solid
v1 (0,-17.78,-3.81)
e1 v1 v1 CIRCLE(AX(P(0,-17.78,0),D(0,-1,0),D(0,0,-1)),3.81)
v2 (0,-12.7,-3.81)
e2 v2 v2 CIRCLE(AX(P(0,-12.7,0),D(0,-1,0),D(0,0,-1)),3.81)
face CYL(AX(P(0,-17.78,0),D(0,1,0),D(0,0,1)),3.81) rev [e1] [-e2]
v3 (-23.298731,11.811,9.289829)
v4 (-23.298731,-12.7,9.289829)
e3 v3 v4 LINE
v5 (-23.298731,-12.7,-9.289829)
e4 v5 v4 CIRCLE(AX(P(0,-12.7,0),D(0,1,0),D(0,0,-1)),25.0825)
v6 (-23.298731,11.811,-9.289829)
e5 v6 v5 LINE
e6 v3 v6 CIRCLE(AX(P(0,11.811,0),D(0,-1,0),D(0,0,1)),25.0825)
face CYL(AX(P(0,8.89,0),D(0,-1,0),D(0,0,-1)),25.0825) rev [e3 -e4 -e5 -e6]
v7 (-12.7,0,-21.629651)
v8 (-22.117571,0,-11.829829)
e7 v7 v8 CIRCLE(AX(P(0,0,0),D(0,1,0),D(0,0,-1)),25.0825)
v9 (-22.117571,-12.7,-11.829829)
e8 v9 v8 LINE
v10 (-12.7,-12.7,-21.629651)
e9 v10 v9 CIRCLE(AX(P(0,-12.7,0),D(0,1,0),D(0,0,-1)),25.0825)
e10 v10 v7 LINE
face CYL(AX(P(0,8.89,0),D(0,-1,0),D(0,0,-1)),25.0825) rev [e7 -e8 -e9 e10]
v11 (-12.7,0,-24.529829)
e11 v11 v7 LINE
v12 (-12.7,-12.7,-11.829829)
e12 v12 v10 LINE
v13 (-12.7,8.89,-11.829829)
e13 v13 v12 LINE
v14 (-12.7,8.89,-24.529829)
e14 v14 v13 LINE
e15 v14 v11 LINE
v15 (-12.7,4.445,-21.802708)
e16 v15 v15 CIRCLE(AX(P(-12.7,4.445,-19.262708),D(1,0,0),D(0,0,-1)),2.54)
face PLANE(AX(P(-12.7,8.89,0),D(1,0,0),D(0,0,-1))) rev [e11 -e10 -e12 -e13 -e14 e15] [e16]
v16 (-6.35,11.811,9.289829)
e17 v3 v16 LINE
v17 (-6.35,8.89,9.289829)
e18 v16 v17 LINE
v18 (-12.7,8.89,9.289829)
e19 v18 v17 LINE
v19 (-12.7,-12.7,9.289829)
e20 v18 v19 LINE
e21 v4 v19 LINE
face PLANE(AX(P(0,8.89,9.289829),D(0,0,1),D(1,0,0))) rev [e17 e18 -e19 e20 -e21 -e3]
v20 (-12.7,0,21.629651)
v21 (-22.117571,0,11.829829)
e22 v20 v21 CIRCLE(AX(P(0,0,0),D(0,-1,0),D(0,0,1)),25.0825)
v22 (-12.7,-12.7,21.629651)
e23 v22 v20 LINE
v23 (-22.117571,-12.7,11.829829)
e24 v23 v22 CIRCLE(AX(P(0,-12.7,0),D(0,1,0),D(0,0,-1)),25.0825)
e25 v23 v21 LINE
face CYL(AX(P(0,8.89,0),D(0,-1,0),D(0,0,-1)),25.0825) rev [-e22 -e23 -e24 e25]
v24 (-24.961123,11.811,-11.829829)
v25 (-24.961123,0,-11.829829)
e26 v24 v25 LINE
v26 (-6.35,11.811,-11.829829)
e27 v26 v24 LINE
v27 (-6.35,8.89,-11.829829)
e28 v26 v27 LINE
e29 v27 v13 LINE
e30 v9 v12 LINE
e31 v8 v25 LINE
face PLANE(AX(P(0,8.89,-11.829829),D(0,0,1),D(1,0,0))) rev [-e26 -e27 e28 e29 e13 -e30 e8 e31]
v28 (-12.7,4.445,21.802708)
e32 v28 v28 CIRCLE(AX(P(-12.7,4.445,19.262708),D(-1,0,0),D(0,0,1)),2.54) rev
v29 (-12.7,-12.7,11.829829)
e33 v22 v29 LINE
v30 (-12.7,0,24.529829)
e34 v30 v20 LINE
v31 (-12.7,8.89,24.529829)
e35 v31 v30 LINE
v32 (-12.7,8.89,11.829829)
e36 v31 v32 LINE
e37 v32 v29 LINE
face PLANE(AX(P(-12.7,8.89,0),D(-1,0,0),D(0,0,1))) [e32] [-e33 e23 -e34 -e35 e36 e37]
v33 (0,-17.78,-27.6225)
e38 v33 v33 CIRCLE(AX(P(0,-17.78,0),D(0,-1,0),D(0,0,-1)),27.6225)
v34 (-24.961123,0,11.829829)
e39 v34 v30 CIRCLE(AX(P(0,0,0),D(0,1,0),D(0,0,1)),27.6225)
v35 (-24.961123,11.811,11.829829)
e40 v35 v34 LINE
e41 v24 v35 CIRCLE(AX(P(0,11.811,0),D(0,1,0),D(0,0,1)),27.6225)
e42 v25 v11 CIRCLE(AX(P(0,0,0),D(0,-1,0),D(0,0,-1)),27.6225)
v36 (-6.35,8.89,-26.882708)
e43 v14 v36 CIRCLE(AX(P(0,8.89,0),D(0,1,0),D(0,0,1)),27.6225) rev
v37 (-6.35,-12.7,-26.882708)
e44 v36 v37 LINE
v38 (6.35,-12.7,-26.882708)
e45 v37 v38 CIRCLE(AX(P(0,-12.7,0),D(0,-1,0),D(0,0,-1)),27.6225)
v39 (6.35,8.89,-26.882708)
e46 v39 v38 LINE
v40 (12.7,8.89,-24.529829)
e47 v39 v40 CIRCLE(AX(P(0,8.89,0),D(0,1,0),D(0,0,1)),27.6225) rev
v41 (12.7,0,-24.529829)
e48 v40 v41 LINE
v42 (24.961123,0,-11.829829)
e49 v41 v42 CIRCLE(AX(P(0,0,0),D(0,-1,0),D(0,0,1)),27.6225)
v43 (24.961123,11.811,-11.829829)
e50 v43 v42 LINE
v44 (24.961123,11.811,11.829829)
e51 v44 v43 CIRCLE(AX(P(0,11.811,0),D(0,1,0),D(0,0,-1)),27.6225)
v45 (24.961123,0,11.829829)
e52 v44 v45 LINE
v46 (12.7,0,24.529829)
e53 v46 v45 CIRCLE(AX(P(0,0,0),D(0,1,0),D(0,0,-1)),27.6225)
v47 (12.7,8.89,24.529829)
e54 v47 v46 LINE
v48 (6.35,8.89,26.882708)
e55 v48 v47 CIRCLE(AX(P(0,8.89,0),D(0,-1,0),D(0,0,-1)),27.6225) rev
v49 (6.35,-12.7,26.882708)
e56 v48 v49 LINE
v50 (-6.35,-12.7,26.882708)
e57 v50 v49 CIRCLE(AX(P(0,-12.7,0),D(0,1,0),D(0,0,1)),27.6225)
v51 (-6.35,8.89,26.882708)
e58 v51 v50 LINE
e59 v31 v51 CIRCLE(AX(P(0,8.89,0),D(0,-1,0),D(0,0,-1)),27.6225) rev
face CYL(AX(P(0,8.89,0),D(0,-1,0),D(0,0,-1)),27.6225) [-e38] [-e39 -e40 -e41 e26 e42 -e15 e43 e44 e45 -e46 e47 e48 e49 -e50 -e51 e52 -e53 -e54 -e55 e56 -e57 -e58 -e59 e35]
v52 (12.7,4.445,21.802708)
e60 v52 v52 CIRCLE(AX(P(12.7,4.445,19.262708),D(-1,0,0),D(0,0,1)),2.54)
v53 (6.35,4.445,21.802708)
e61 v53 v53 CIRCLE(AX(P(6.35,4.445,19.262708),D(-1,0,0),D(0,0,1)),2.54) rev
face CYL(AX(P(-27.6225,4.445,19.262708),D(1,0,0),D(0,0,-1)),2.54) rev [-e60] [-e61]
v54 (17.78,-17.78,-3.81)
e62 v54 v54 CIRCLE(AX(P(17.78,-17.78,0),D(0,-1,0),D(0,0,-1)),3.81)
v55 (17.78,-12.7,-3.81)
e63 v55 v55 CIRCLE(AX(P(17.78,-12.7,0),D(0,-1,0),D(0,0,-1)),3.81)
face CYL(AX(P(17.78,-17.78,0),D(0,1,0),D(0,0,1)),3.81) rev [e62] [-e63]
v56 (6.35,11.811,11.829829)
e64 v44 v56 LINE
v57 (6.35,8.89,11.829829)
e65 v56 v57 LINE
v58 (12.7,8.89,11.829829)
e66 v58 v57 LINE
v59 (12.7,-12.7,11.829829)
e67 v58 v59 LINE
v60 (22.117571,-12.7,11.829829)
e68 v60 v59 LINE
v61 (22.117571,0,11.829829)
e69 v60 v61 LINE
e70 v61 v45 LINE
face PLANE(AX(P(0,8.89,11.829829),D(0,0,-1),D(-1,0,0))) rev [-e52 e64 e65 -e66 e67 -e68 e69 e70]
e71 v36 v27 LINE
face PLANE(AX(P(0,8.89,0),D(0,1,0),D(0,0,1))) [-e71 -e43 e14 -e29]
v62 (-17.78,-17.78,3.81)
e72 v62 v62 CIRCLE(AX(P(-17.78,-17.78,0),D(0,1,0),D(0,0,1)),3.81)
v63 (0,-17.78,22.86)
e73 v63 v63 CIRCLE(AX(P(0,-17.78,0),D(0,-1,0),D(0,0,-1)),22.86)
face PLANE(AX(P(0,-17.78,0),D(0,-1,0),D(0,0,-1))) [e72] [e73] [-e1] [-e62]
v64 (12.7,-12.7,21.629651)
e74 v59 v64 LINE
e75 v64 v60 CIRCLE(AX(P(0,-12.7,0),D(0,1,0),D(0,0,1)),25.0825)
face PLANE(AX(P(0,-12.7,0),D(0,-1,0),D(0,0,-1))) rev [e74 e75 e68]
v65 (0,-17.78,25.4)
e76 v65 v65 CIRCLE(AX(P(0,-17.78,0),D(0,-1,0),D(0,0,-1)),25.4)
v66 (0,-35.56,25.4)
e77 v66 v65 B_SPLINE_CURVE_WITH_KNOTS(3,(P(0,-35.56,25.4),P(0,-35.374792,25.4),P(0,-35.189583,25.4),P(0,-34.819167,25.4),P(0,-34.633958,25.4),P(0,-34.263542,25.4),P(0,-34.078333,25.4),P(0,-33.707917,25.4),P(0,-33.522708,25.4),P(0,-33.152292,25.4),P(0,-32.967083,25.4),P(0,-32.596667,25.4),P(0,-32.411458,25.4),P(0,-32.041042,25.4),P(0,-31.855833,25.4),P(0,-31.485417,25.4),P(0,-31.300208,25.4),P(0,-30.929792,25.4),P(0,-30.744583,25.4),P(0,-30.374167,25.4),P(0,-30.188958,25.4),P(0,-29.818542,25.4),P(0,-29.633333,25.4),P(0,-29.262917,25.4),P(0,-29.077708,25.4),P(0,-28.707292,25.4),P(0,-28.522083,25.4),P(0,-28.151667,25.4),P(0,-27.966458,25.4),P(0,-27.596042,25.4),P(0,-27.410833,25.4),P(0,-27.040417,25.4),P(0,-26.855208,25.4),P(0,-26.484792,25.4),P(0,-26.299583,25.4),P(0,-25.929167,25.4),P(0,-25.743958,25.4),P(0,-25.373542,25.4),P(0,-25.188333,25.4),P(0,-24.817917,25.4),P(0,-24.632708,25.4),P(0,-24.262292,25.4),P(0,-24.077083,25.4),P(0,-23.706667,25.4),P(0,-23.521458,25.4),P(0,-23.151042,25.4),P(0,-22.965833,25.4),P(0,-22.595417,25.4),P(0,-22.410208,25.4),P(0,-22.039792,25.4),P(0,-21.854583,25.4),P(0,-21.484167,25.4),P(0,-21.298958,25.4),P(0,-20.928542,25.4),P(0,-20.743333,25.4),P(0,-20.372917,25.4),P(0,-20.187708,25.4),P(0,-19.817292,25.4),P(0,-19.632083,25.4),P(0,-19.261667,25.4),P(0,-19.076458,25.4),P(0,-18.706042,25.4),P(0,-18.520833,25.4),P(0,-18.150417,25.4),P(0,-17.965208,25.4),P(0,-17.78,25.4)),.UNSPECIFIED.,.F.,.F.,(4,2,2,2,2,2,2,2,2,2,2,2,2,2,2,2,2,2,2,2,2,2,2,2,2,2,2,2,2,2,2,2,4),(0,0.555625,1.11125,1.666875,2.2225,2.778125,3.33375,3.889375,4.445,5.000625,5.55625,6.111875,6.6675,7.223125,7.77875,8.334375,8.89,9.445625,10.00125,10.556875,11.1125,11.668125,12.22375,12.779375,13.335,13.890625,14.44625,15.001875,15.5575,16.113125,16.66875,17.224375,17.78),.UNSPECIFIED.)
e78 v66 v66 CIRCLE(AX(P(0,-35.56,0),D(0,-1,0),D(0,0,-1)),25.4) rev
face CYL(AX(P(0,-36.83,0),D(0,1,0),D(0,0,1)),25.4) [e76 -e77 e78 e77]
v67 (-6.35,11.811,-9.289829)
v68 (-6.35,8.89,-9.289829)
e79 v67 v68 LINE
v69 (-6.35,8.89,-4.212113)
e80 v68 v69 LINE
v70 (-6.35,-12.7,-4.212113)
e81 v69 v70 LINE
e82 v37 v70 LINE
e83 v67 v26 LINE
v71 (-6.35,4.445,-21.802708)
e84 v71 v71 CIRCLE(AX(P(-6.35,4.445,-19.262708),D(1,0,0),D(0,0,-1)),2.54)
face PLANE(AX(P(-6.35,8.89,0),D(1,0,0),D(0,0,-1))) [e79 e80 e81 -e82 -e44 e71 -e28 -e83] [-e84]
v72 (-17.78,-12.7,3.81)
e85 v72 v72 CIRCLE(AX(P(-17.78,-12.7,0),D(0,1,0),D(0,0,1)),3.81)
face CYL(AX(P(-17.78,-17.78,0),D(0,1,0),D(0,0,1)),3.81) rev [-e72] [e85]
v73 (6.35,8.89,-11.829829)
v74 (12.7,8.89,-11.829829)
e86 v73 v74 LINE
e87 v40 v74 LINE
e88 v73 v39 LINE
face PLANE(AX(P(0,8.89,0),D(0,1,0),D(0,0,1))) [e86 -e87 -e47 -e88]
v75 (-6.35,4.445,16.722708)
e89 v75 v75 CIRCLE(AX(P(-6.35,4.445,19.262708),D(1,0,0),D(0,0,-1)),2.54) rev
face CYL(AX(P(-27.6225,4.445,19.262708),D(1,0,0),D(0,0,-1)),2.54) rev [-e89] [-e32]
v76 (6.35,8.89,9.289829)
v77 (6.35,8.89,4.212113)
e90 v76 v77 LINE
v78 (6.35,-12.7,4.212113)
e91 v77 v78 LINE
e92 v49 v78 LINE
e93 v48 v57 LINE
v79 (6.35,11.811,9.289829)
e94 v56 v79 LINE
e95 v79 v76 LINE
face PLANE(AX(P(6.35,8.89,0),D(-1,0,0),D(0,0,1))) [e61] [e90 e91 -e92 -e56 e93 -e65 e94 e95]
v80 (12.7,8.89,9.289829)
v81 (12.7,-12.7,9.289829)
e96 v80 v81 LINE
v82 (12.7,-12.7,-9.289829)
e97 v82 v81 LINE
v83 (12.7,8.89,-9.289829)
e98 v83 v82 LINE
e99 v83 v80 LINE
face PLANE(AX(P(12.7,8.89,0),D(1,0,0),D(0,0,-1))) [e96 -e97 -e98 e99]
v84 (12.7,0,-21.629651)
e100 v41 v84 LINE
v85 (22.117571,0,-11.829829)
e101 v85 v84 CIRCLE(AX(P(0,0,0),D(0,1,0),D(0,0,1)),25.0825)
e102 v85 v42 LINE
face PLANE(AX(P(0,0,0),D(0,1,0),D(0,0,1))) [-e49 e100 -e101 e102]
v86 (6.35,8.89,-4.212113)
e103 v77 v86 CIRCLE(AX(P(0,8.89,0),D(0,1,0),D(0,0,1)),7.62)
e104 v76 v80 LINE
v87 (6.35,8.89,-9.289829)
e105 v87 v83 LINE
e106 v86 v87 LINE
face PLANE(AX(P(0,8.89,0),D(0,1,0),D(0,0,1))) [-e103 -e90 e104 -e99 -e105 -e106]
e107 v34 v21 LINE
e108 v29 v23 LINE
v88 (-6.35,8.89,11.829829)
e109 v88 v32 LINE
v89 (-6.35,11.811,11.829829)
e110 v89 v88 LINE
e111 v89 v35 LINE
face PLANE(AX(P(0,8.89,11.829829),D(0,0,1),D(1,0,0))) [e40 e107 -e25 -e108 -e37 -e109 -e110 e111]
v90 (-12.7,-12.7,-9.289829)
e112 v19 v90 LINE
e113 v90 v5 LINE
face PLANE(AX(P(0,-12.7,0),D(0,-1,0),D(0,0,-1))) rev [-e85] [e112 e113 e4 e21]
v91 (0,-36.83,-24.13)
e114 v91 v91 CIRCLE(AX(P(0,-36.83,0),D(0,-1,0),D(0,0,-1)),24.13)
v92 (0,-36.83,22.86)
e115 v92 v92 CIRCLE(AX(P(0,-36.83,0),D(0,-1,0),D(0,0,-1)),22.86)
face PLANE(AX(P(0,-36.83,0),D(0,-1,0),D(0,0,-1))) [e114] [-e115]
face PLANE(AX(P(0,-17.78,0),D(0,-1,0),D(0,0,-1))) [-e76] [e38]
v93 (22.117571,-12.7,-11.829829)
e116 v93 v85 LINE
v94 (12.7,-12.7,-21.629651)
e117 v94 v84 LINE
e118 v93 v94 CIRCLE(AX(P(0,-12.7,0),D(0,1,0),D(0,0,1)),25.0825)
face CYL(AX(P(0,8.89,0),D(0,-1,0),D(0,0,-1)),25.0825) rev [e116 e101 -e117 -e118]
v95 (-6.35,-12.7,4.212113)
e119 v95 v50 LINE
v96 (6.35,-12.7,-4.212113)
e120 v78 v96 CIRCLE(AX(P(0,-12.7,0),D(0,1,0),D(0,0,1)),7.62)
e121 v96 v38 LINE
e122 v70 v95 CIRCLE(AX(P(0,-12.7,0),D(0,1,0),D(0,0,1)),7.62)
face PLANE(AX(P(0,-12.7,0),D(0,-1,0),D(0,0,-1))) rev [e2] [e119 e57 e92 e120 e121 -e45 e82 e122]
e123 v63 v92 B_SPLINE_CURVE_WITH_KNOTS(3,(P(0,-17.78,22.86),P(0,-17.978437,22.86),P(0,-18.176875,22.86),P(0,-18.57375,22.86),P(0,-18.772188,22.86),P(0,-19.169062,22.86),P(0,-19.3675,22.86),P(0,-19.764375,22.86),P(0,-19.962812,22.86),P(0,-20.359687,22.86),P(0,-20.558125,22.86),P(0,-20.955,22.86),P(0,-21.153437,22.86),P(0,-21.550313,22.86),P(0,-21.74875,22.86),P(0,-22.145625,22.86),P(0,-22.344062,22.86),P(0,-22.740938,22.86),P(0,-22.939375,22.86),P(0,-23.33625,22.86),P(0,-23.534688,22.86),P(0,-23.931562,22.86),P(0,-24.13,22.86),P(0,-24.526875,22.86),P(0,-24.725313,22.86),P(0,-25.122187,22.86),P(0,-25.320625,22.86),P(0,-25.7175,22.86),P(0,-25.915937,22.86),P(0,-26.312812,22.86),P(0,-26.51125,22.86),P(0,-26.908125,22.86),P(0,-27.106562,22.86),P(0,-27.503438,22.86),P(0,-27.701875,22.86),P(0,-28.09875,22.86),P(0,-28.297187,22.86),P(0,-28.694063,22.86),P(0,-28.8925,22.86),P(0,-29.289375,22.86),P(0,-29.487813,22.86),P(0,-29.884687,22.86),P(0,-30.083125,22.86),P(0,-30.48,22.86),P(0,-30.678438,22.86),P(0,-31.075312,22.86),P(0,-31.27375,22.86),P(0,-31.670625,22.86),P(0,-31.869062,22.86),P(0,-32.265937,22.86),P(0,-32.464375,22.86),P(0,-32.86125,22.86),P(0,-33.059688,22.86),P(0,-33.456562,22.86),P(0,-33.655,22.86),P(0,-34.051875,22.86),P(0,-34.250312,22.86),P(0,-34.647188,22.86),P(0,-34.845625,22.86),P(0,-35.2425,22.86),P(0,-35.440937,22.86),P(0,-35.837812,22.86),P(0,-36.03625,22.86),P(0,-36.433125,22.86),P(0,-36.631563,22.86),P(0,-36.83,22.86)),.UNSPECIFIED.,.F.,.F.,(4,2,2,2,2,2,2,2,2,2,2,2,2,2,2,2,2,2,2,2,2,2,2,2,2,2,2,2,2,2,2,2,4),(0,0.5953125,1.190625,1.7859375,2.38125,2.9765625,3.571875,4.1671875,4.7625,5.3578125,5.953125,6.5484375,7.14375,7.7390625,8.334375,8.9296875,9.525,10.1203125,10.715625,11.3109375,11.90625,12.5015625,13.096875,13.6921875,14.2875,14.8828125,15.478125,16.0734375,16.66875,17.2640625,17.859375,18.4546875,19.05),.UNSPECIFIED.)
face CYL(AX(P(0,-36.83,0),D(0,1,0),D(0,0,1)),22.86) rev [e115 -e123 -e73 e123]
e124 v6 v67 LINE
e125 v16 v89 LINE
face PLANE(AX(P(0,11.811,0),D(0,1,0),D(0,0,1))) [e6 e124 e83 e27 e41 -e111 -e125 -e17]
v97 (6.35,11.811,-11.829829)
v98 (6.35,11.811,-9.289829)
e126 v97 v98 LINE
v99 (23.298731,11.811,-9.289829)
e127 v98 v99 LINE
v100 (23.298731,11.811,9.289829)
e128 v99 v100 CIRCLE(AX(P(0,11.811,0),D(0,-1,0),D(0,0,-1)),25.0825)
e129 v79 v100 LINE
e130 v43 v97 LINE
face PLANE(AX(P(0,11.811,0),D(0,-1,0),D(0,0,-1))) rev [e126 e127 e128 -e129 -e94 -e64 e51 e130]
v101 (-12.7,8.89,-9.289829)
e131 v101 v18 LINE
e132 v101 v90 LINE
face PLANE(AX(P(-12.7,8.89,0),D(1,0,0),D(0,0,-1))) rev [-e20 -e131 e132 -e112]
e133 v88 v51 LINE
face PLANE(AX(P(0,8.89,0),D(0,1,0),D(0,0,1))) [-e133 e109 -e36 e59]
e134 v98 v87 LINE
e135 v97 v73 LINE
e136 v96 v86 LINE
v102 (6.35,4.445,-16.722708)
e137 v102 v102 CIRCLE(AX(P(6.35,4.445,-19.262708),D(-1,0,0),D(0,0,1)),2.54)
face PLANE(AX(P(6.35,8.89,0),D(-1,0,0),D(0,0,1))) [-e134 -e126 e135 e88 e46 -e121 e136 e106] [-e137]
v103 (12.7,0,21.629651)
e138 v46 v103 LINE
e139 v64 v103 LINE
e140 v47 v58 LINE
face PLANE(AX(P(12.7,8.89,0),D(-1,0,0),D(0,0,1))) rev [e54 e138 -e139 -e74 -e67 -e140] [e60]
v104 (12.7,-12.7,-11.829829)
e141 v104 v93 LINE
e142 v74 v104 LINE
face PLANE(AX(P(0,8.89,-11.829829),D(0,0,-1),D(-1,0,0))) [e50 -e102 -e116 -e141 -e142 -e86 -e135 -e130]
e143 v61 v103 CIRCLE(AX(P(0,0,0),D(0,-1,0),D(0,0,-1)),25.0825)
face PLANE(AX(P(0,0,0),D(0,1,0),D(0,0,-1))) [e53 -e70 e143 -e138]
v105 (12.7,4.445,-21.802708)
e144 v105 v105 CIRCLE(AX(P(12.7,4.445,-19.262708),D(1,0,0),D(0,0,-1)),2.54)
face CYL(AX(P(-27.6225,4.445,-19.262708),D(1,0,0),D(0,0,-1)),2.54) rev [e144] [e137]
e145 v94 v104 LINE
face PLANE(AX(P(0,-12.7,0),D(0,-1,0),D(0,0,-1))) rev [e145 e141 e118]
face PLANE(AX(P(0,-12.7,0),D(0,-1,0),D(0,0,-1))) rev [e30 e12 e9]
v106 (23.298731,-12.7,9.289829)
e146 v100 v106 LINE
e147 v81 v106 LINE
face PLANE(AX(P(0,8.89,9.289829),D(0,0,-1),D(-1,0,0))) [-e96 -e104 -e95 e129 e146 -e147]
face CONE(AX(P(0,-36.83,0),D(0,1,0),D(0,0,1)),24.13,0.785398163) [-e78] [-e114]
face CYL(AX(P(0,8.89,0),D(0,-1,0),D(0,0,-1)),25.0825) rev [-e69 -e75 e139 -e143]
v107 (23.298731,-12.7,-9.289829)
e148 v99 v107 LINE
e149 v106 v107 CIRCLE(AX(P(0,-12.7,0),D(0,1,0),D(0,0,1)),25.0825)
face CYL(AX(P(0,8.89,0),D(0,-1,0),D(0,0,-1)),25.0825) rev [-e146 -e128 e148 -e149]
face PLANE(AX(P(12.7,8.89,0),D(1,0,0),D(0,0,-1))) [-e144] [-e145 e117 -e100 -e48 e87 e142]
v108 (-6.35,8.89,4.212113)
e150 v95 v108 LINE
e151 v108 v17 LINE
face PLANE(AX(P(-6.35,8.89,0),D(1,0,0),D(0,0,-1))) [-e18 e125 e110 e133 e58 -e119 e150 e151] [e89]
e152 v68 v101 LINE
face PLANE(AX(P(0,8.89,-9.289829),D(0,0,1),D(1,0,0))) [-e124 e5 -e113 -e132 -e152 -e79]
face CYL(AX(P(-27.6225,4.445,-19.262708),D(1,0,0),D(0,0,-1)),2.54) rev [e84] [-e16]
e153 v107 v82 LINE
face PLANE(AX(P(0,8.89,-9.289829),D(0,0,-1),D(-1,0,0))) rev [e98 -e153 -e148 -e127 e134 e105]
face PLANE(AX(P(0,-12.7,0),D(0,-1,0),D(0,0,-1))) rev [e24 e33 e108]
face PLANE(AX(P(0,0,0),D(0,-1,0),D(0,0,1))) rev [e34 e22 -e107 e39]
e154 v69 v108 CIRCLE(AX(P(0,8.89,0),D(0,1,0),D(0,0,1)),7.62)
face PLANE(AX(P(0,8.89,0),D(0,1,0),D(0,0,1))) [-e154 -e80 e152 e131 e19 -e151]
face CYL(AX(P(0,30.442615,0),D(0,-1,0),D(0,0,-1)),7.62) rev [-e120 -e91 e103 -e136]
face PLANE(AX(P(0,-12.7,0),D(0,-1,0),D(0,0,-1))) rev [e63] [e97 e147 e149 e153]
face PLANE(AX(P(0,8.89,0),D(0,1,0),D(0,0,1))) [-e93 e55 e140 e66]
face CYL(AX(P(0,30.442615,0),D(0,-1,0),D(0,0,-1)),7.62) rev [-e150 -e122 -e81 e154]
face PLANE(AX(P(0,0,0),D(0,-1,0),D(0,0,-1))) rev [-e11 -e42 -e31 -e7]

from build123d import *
from build123d.topology import SkipClean

# Parameters (mm, degrees)
HINGE_DEPTH           = 8.89
HINGE_2_DEPTH         = 8.89
SKETCH2_R             = 2.54
HINGE_HOLES_DEPTH     = 50.270844447
BODY_START            = 12.7
BODY_DEPTH            = 12.7
BOTTOM_PLATE_START    = 5.08
BOTTOM_PLATE_DEPTH    = 5.08
TUBE_CONNECTION_DEPTH = 19.05
BACKSTOP_DEPTH        = 2.921
CONNECT_TO_BASE_START = 12.7
CONNECT_TO_BASE_DEPTH = 12.7
SKETCH13_R            = 7.62
BOLT_ACCESS_DEPTH     = 21.59
BOTTOM_CHAMFER_SIZE   = 1.27


with BuildPart() as part:
    # Sketch1 → hinge (new body)
    with BuildSketch(Plane(origin=(0, 0, 0), x_dir=(1, 0, 0), z_dir=(0, 1, 0))):
        with BuildLine():
            ThreePointArc((-6.35, 26.882708313), (-9.597376484, 25.901599774), (-12.7, 24.529828908))
            Line((-12.7, 24.529828908), (-12.7, 11.829828908))
            Line((-12.7, 11.829828908), (-24.961122857, 11.829828908))
            ThreePointArc((-24.961122857, 11.829828908), (-26.9489436, 6.062750619), (-27.6225, 0))
            Line((-27.6225, 0), (-25.0825, 0))
            ThreePointArc((-25.0825, 0), (-24.632521559, 4.729766155), (-23.298731406, 9.289828908))
            Line((-23.298731406, 9.289828908), (-12.7, 9.289828908))
            Line((-12.7, 9.289828908), (-12.7, 0))
            Line((-12.7, 0), (-6.35, 0))
            Line((-6.35, 0), (-6.35, 26.882708313))
        make_face()
    hinge = extrude(amount=HINGE_DEPTH)


with BuildPart() as body_2:
    # Sketch1 → hinge 2 (new body)
    with BuildSketch(Plane(origin=(0, 0, 0), x_dir=(1, 0, 0), z_dir=(0, 1, 0))):
        with BuildLine():
            ThreePointArc((12.7, 24.529828908), (9.597376484, 25.901599774), (6.35, 26.882708313))
            Line((6.35, 26.882708313), (6.35, 0))
            Line((6.35, 0), (12.7, 0))
            Line((12.7, 0), (12.7, 9.289828908))
            Line((12.7, 9.289828908), (23.298731406, 9.289828908))
            ThreePointArc((23.298731406, 9.289828908), (24.632521559, 4.729766155), (25.0825, 0))
            Line((25.0825, 0), (27.6225, 0))
            ThreePointArc((27.6225, 0), (26.9489436, 6.062750619), (24.961122857, 11.829828908))
            Line((24.961122857, 11.829828908), (12.7, 11.829828908))
            Line((12.7, 11.829828908), (12.7, 24.529828908))
        make_face()
    hinge_2 = extrude(amount=HINGE_2_DEPTH)


with BuildPart() as hinge_holes_tool:
    # Sketch2 → hinge_holes (new, through all)
    with BuildSketch(Plane(origin=(12.7, 0, 0), x_dir=(0, 0, -1), z_dir=(1, 0, 0))):
        with Locations((19.262708313, 4.445)):
            Circle(SKETCH2_R)
    hinge_holes = extrude(amount=-HINGE_HOLES_DEPTH)


with BuildPart() as part_1:
    add(part.part)

    # hinge_holes: cut by hinge_holes_tool
    add(hinge_holes_tool.part, mode=Mode.SUBTRACT)



with BuildPart() as body_2_1:
    add(body_2.part)

    # hinge_holes: cut by hinge_holes_tool
    add(hinge_holes_tool.part, mode=Mode.SUBTRACT)


with BuildPart() as part_2:
    add(part_1.part)

    add(body_2_1.part)  # body merges body 2
    # Sketch5 → body (add)
    with BuildSketch(Plane.XZ.offset(BODY_START)):
        with BuildLine():
            Line((-27.6225, 0), (-25.0825, 0))
            ThreePointArc((-25.0825, 0), (-19.854542065, -15.327392656), (-6.35, -24.265393181))
            Line((-6.35, -24.265393181), (-6.35, -26.882708313))
            ThreePointArc((-6.35, -26.882708313), (-21.661087014, -17.140589711), (-27.6225, 0))
        make_face()
        with BuildLine():
            Line((25.0825, 0), (27.6225, 0))
            ThreePointArc((27.6225, 0), (21.661087014, -17.140589711), (6.35, -26.882708313))
            Line((6.35, -26.882708313), (6.35, -24.265393181))
            ThreePointArc((6.35, -24.265393181), (19.854542065, -15.327392656), (25.0825, 0))
        make_face()
    body = extrude(amount=-BODY_DEPTH)

    # Sketch6 → bottom_plate (add)
    with SkipClean():  # the faces are left unmerged after this step: merging them gives an invalid solid
        with BuildSketch(Plane.XZ.offset(12.7).offset(BOTTOM_PLATE_START)):
            with BuildLine():
                Line((13.97, 0), (3.81, 0))
                ThreePointArc((3.81, 0), (0, -3.81), (-3.81, 0))
                Line((-3.81, 0), (-13.97, 0))
                ThreePointArc((-13.97, 0), (-17.78, -3.81), (-21.59, 0))
                Line((-21.59, 0), (-27.6225, 0))
                ThreePointArc((-27.6225, 0), (0, -27.6225), (27.6225, 0))
                Line((27.6225, 0), (21.59, 0))
                ThreePointArc((21.59, 0), (17.78, -3.81), (13.97, 0))
            make_face()
        bottom_plate = extrude(amount=-BOTTOM_PLATE_DEPTH)

    # Sketch7 → tube_connection (add)
    with SkipClean():  # the faces are left unmerged after this step: merging them gives an invalid solid
        with BuildSketch(Plane.XZ.offset(17.78)):
            with BuildLine():
                Line((-22.86, 0), (-25.4, 0))
                ThreePointArc((-25.4, 0), (0, -25.4), (25.4, 0))
                Line((25.4, 0), (22.86, 0))
                ThreePointArc((22.86, 0), (0, -22.86), (-22.86, 0))
            make_face()
        tube_connection = extrude(amount=TUBE_CONNECTION_DEPTH)

    # Sketch10 → backstop (add)
    with SkipClean():  # the faces are left unmerged after this step: merging them gives an invalid solid
        with BuildSketch(Plane(origin=(0, 8.89, 0), x_dir=(1, 0, 0), z_dir=(0, 1, 0))):
            with BuildLine():
                Line((-23.298731406, 9.289828908), (-6.35, 9.289828908))
                Line((-6.35, 9.289828908), (-6.35, 11.829828908))
                Line((-6.35, 11.829828908), (-24.961122857, 11.829828908))
                ThreePointArc((-24.961122857, 11.829828908), (-26.9489436, 6.062750619), (-27.6225, 0))
                Line((-27.6225, 0), (-25.0825, 0))
                ThreePointArc((-25.0825, 0), (-24.632521559, 4.729766155), (-23.298731406, 9.289828908))
            make_face()
            with BuildLine():
                Line((6.35, 11.829828908), (24.961122857, 11.829828908))
                ThreePointArc((24.961122857, 11.829828908), (26.9489436, 6.062750619), (27.6225, 0))
                Line((27.6225, 0), (25.0825, 0))
                ThreePointArc((25.0825, 0), (24.632521559, 4.729766155), (23.298731406, 9.289828908))
                Line((23.298731406, 9.289828908), (6.35, 9.289828908))
                Line((6.35, 9.289828908), (6.35, 11.829828908))
            make_face()
        backstop = extrude(amount=BACKSTOP_DEPTH)

    # Mirror1: hinge, hinge 2, hinge_holes, body, bottom_plate, tube_connection, backstop across plane
    with SkipClean():  # the faces are left unmerged after this step: merging them gives an invalid solid
        add(hinge.mirror(Plane(origin=(0, 8.89, 0), x_dir=(1, 0, 0), z_dir=(0, 0, 1))))
        add(hinge_2.mirror(Plane(origin=(0, 8.89, 0), x_dir=(1, 0, 0), z_dir=(0, 0, 1))))
        add(hinge_holes.mirror(Plane(origin=(0, 8.89, 0), x_dir=(1, 0, 0), z_dir=(0, 0, 1))), mode=Mode.SUBTRACT)
        add(body.mirror(Plane(origin=(0, 8.89, 0), x_dir=(1, 0, 0), z_dir=(0, 0, 1))))
        add(bottom_plate.mirror(Plane(origin=(0, 8.89, 0), x_dir=(1, 0, 0), z_dir=(0, 0, 1))))
        add(tube_connection.mirror(Plane(origin=(0, 8.89, 0), x_dir=(1, 0, 0), z_dir=(0, 0, 1))))
        add(backstop.mirror(Plane(origin=(0, 8.89, 0), x_dir=(1, 0, 0), z_dir=(0, 0, 1))))

    # Sketch12 → connect_to_base (add)
    with SkipClean():  # the faces are left unmerged after this step: merging them gives an invalid solid
        with BuildSketch(Plane.XZ.offset(CONNECT_TO_BASE_START)):
            with BuildLine():
                Line((-6.35, -24.265393181), (-6.35, 24.265393181))
                ThreePointArc((-6.35, 24.265393181), (-9.615737574, 23.166126071), (-12.7, 21.629651089))
                Line((-12.7, 21.629651089), (-12.7, 11.829828908))
                Line((-12.7, 11.829828908), (-22.117571165, 11.829828908))
                ThreePointArc((-22.117571165, 11.829828908), (-22.743637238, 10.576330717), (-23.298731406, 9.289828908))
                Line((-23.298731406, 9.289828908), (-12.7, 9.289828908))
                Line((-12.7, 9.289828908), (-12.7, -9.289828908))
                Line((-12.7, -9.289828908), (-23.298731406, -9.289828908))
                ThreePointArc((-23.298731406, -9.289828908), (-22.743637238, -10.576330717), (-22.117571165, -11.829828908))
                Line((-22.117571165, -11.829828908), (-12.7, -11.829828908))
                Line((-12.7, -11.829828908), (-12.7, -21.629651089))
                ThreePointArc((-12.7, -21.629651089), (-9.615737574, -23.166126071), (-6.35, -24.265393181))
            make_face()
            with BuildLine():
                Line((12.7, 9.289828908), (23.298731406, 9.289828908))
                ThreePointArc((23.298731406, 9.289828908), (22.743637238, 10.576330717), (22.117571165, 11.829828908))
                Line((22.117571165, 11.829828908), (12.7, 11.829828908))
                Line((12.7, 11.829828908), (12.7, 21.629651089))
                ThreePointArc((12.7, 21.629651089), (9.615737574, 23.166126071), (6.35, 24.265393181))
                Line((6.35, 24.265393181), (6.35, -24.265393181))
                ThreePointArc((6.35, -24.265393181), (9.615737574, -23.166126071), (12.7, -21.629651089))
                Line((12.7, -21.629651089), (12.7, -11.829828908))
                Line((12.7, -11.829828908), (22.117571165, -11.829828908))
                ThreePointArc((22.117571165, -11.829828908), (22.743637238, -10.576330717), (23.298731406, -9.289828908))
                Line((23.298731406, -9.289828908), (12.7, -9.289828908))
                Line((12.7, -9.289828908), (12.7, 9.289828908))
            make_face()
        extrude(amount=-CONNECT_TO_BASE_DEPTH)
    add(part_2.part.scale(1), mode=Mode.REPLACE)  # the faces are merged on a copy

    # Sketch13 → bolt_access (cut)
    with BuildSketch(Plane(origin=(0, -12.7, 0), x_dir=(1, 0, 0), z_dir=(0, 1, 0))):
        Circle(SKETCH13_R)
    extrude(amount=BOLT_ACCESS_DEPTH, mode=Mode.SUBTRACT)

    # bottom_chamfer
    bottom_chamfer_edges = [part_2.edges().sort_by_distance(p)[0] for p in [
        (0, -36.83, -25.4),
    ]]
    chamfer(bottom_chamfer_edges, length=BOTTOM_CHAMFER_SIZE)


solid = part_2.part
